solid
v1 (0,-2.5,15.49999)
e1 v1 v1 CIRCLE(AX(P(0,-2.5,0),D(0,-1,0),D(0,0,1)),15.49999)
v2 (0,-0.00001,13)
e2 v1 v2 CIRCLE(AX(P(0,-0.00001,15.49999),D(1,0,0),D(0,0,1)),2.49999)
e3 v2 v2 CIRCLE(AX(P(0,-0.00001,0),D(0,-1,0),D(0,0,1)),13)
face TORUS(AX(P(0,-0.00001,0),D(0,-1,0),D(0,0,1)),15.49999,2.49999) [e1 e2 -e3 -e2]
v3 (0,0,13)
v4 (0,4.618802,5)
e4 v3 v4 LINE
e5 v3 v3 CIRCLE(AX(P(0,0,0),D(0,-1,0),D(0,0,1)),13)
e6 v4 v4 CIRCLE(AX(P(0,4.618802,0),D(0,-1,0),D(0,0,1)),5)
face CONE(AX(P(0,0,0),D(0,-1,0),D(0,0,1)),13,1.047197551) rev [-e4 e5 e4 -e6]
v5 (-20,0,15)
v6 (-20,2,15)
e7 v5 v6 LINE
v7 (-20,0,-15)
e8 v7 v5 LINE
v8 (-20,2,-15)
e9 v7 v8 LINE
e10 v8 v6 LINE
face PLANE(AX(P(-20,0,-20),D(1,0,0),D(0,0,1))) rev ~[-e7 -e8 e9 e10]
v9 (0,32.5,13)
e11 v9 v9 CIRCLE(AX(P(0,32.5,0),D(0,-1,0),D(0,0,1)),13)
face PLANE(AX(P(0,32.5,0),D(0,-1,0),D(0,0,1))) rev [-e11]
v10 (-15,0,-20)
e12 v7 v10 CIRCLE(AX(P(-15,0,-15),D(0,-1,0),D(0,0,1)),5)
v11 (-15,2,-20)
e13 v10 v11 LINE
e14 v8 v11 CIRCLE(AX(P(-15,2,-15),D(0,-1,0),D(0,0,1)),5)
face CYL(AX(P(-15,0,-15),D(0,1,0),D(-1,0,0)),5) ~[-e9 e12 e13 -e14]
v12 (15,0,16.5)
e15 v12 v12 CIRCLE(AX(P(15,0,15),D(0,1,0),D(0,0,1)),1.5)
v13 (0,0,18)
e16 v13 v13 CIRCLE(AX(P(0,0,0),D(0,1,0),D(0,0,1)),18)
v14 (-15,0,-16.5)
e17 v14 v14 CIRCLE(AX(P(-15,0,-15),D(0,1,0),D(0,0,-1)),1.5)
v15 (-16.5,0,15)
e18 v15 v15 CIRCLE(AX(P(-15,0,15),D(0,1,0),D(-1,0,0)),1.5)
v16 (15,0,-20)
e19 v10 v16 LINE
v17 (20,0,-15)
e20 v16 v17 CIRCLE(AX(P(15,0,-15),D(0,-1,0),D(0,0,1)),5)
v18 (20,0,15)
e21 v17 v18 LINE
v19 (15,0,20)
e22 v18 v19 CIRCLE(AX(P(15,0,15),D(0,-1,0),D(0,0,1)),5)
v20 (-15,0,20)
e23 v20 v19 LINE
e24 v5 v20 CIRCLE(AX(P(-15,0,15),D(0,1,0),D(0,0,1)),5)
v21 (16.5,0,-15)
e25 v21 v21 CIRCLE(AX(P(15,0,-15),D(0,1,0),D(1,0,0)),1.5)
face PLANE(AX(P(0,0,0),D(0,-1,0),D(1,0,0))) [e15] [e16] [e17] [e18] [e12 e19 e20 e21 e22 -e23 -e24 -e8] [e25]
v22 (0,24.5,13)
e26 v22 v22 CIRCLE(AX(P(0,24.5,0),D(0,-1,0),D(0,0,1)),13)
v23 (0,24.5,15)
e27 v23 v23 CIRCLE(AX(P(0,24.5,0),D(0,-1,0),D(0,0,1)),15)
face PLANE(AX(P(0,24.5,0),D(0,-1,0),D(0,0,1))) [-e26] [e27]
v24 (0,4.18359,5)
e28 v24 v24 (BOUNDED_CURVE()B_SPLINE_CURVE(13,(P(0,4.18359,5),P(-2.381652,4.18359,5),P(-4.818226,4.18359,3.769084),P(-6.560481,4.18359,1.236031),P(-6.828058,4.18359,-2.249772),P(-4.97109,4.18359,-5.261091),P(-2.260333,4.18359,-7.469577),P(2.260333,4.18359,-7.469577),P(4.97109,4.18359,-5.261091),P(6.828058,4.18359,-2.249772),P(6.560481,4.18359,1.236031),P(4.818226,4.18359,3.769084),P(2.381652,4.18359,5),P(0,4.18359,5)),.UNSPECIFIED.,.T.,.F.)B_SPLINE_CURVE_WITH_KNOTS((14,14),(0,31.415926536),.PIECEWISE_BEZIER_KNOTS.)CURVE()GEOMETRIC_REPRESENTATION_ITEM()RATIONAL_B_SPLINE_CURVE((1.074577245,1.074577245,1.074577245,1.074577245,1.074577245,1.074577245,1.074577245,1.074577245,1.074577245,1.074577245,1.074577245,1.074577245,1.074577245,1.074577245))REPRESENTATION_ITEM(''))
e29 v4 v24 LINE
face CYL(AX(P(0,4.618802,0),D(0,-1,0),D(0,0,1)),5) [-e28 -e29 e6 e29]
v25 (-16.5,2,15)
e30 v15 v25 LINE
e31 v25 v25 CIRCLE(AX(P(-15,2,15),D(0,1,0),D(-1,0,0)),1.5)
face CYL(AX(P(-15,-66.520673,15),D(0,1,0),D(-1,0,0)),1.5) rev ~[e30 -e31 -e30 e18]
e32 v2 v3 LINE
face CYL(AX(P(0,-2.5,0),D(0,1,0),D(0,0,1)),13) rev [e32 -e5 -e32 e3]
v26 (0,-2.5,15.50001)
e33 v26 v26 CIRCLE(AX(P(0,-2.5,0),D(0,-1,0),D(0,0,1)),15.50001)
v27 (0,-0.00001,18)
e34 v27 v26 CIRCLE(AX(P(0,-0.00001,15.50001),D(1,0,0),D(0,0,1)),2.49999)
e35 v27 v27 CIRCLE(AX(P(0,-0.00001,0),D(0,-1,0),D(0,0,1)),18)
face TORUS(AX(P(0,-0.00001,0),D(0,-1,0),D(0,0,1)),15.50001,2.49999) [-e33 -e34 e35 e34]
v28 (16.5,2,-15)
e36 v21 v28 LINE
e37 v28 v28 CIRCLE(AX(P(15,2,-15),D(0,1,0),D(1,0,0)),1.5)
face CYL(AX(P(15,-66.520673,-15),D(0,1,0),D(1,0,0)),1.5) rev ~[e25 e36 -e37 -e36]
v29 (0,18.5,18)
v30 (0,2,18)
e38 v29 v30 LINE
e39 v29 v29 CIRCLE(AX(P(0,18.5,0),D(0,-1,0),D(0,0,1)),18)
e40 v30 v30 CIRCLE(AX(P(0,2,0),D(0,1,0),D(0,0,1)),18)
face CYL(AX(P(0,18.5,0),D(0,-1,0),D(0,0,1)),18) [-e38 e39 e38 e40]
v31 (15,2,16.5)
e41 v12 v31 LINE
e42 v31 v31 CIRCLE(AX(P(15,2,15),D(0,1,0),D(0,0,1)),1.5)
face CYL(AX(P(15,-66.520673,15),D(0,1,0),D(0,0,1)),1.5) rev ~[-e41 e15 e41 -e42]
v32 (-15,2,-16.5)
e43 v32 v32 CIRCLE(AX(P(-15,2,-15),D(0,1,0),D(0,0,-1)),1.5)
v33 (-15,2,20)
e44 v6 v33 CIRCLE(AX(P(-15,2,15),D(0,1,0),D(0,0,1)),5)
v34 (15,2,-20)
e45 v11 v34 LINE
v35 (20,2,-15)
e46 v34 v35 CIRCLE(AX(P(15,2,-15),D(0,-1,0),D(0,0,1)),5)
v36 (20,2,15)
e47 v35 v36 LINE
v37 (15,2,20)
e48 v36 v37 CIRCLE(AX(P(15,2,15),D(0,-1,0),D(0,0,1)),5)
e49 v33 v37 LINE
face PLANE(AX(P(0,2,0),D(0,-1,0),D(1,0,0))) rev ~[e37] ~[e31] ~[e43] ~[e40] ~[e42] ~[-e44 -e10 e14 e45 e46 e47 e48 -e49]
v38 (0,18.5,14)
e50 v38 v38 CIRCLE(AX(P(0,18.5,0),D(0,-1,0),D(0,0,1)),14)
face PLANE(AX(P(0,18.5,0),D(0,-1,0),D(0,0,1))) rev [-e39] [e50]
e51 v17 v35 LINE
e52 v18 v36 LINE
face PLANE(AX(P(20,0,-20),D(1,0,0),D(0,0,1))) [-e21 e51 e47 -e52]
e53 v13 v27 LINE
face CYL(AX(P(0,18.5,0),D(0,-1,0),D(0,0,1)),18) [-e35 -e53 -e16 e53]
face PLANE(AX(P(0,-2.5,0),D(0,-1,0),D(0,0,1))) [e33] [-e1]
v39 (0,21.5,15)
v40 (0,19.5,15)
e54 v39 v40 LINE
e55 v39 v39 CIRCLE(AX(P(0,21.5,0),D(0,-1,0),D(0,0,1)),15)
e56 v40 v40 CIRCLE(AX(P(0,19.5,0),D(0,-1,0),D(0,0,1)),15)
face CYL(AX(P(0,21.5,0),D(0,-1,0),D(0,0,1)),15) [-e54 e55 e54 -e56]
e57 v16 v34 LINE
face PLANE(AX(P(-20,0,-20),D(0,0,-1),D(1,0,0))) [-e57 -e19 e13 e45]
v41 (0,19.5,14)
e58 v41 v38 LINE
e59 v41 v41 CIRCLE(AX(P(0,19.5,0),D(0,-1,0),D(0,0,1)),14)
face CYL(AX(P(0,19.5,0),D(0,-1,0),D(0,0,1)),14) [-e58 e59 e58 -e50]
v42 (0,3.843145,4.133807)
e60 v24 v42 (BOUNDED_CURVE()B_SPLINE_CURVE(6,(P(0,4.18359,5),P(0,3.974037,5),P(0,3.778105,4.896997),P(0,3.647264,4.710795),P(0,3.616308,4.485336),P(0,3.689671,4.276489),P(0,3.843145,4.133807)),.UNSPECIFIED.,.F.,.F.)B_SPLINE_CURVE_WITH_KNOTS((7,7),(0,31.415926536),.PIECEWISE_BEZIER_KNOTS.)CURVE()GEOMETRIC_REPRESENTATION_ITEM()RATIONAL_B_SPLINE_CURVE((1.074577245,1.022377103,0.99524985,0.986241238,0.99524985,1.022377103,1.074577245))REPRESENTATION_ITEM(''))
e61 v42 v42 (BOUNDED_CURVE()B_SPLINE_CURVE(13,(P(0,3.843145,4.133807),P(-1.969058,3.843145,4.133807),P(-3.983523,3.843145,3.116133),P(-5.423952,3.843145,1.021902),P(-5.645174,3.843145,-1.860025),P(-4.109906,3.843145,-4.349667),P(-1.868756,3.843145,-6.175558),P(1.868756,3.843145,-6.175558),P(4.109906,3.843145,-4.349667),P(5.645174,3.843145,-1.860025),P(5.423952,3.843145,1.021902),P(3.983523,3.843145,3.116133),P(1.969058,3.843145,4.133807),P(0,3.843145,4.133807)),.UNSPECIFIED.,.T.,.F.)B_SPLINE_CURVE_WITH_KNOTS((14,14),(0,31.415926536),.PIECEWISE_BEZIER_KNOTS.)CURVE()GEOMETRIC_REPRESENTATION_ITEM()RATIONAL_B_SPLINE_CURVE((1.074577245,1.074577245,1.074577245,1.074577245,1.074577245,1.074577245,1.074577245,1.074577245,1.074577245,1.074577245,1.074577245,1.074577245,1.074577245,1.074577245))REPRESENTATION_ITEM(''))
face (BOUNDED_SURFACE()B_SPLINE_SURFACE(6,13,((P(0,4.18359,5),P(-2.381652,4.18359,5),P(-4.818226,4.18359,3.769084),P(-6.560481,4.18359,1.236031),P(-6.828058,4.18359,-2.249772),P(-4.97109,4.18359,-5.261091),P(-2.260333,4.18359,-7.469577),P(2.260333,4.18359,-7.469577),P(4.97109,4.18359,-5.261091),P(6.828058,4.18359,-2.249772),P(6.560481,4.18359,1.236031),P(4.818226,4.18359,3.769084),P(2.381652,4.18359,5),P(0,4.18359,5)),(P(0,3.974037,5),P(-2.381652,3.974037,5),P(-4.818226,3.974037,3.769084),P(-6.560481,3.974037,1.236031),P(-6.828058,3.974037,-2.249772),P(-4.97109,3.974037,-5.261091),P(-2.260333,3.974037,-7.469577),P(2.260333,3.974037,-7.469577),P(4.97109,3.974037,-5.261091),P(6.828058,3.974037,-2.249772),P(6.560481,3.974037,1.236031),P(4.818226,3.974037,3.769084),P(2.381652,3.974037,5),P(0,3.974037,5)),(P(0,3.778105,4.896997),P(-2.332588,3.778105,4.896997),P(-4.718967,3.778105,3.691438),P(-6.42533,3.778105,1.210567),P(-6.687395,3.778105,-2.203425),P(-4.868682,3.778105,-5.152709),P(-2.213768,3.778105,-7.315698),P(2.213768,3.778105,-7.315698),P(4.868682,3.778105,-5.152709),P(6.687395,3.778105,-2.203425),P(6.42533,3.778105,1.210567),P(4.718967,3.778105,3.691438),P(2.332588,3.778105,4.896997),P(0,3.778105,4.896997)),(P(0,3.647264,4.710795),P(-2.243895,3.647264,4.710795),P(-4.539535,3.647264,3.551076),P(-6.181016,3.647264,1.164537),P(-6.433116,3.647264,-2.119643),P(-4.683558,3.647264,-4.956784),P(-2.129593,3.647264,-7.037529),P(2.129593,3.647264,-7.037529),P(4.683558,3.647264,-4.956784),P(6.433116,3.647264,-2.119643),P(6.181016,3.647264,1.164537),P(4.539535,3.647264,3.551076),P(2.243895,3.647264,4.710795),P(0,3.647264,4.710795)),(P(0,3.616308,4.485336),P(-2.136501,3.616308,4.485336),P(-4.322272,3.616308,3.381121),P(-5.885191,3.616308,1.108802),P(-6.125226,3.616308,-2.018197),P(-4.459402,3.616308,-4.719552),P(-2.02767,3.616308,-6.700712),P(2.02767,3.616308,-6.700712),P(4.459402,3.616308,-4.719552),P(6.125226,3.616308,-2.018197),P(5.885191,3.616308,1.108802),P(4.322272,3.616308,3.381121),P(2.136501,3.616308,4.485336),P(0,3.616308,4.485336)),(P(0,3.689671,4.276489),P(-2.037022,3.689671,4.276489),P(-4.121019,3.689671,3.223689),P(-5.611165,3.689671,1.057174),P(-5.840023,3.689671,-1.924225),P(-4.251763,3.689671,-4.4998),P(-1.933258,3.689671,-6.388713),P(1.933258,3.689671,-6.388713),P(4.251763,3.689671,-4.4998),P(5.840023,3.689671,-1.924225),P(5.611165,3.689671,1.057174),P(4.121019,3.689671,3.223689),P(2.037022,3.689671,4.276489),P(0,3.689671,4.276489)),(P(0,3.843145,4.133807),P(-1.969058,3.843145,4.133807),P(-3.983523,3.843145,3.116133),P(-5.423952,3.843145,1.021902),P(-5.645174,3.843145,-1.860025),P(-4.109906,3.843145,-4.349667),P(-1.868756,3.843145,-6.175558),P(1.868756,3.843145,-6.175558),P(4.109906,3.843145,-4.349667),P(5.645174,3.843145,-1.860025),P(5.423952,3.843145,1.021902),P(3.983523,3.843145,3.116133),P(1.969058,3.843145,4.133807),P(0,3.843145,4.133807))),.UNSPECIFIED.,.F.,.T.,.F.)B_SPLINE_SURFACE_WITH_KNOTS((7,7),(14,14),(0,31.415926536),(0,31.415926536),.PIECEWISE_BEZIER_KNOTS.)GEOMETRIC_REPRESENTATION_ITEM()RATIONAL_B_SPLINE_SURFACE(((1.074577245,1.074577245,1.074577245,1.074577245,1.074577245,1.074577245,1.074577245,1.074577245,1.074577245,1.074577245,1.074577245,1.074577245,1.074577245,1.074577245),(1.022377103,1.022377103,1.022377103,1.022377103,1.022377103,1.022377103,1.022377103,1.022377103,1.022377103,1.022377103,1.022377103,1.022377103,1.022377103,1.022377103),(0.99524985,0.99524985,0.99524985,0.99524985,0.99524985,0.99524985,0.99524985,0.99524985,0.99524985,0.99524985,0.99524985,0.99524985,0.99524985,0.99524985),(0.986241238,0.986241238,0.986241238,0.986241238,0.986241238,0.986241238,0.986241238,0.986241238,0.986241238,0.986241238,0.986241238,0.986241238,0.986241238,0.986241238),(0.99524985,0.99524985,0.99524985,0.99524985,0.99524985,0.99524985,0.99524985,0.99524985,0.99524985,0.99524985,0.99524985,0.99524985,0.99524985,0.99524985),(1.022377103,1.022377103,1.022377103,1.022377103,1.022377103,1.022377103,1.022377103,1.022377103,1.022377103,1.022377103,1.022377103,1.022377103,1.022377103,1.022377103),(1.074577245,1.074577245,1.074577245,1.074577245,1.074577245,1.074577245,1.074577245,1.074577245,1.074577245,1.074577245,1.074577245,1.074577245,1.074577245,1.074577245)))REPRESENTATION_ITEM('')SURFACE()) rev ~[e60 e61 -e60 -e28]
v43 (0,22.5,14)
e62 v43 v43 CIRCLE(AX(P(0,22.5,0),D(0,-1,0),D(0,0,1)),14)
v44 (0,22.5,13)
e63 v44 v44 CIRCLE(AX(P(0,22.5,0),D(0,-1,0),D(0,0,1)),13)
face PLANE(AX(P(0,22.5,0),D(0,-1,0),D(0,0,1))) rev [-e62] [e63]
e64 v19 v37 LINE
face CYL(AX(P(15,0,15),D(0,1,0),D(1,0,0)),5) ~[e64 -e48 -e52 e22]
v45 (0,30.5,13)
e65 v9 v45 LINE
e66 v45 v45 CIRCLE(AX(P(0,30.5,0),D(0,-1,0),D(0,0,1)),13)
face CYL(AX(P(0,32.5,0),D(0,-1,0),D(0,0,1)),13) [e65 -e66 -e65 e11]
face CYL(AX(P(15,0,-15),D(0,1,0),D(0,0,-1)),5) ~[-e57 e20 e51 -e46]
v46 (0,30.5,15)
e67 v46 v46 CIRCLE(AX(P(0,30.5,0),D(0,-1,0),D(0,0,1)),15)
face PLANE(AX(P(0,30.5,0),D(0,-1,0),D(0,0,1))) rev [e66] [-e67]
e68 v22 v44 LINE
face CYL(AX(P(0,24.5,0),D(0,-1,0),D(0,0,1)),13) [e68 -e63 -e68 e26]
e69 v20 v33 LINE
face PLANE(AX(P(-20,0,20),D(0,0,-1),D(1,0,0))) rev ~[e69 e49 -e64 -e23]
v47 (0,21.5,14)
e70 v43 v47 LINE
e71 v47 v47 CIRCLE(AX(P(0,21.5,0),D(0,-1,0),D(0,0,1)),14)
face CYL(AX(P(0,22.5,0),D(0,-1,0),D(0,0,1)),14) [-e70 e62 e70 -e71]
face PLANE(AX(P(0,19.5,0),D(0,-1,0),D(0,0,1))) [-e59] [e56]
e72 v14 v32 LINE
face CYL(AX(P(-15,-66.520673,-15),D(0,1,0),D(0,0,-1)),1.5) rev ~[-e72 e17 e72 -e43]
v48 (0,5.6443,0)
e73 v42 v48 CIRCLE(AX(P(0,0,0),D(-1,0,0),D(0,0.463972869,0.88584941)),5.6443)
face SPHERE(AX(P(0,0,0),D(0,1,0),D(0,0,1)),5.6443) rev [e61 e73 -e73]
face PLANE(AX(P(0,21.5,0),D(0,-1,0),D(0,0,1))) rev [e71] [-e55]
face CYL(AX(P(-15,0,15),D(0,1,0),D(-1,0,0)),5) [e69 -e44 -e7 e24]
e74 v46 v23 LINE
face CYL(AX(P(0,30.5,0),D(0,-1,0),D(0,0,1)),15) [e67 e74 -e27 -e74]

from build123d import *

# Parameters (mm, degrees)
F0_W             = 40
F0_H             = 40
F1_DEPTH         = 2
F2_R             = 5
F3_R             = 18
F4_DEPTH         = 2
F7_R             = 2.49999
F8_R             = 0.5
F10_D            = 3
F10_COPIES_COUNT = 4


# Not quite as in the source:
# - a fillet or chamfer is up to 0.001 mm smaller than in the source, because OpenCascade refuses the exact size
# - a pattern or mirror of a feature is missing from the dataset's text; its kind, count and spacing are read off the source's solid


with BuildPart() as f1:
    # F0 (on Front) → F1 (new body)
    with BuildSketch(Plane.XZ):
        Rectangle(F0_W, F0_H)
    extrude(amount=-F1_DEPTH)

    # F2
    f2_edges = [f1.edges().sort_by_distance(p)[0] for p in [
        (20, 1, 20),
        (20, 1, -20),
        (-20, 1, -20),
        (-20, 1, 20),
    ]]
    fillet(f2_edges, radius=F2_R)

    # F3 (on face) → F4 (cut, through all)
    with BuildSketch(Plane.XZ):
        Circle(F3_R)
    extrude(amount=-F4_DEPTH, mode=Mode.SUBTRACT)

    # F5 (on Right) → F6 (revolve)
    with BuildSketch(Plane.YZ):
        with BuildLine():
            Line((18.5, 18), (0, 18))
            Line((0, 18), (-2.5, 18))
            Line((-2.5, 18), (-2.5, 13))
            Line((-2.5, 13), (0, 13))
            Line((0, 13), (4.6188021535, 5))
            Line((4.6188021535, 5), (2.6188021535, 5))
            ThreePointArc((2.6188021535, 5), (4.8290490902, 2.9220557153), (5.6443001975, 0))
            Line((5.6443001975, 0), (32.5, 0))
            Line((32.5, 0), (32.5, 13))
            Line((32.5, 13), (30.5, 13))
            Line((30.5, 13), (30.5, 15))
            Line((30.5, 15), (24.5, 15))
            Line((24.5, 15), (24.5, 13))
            Line((24.5, 13), (22.5, 13))
            Line((22.5, 13), (22.5, 14))
            Line((22.5, 14), (21.5, 14))
            Line((21.5, 14), (21.5, 15))
            Line((21.5, 15), (19.5, 15))
            Line((19.5, 15), (19.5, 14))
            Line((19.5, 14), (18.5, 14))
            Line((18.5, 14), (18.5, 18))
        make_face()
    revolve(axis=Axis((0, 19.0721500987, 0), (0, -1, 0)))

    # F7 (radius 2.5 in the source; OpenCascade refuses exactly that, so slightly less here)
    f7_edges = [f1.edges().sort_by_distance(p)[0] for p in [
        (0, -2.5, -18),
        (0, -2.5, -13),
    ]]
    fillet(f7_edges, radius=F7_R)

    # F8
    f8_edges = [f1.edges().sort_by_distance(p)[0] for p in [
        (0, 2.618802, -5),
    ]]
    fillet(f8_edges, radius=F8_R)

    # F10 (through all)
    with Locations(Plane.XZ):
        with Locations((-15, 15)):
            f10 = Hole(F10_D / 2)

    # F10_copies: F10 ×4 about axis
    f10_copies_axis = Axis((0, 0, 0), (0, 1, 0))
    for i in range(1, F10_COPIES_COUNT):
        add(f10.rotate(f10_copies_axis, i * 360 / F10_COPIES_COUNT), mode=Mode.SUBTRACT)


solid = f1.part
